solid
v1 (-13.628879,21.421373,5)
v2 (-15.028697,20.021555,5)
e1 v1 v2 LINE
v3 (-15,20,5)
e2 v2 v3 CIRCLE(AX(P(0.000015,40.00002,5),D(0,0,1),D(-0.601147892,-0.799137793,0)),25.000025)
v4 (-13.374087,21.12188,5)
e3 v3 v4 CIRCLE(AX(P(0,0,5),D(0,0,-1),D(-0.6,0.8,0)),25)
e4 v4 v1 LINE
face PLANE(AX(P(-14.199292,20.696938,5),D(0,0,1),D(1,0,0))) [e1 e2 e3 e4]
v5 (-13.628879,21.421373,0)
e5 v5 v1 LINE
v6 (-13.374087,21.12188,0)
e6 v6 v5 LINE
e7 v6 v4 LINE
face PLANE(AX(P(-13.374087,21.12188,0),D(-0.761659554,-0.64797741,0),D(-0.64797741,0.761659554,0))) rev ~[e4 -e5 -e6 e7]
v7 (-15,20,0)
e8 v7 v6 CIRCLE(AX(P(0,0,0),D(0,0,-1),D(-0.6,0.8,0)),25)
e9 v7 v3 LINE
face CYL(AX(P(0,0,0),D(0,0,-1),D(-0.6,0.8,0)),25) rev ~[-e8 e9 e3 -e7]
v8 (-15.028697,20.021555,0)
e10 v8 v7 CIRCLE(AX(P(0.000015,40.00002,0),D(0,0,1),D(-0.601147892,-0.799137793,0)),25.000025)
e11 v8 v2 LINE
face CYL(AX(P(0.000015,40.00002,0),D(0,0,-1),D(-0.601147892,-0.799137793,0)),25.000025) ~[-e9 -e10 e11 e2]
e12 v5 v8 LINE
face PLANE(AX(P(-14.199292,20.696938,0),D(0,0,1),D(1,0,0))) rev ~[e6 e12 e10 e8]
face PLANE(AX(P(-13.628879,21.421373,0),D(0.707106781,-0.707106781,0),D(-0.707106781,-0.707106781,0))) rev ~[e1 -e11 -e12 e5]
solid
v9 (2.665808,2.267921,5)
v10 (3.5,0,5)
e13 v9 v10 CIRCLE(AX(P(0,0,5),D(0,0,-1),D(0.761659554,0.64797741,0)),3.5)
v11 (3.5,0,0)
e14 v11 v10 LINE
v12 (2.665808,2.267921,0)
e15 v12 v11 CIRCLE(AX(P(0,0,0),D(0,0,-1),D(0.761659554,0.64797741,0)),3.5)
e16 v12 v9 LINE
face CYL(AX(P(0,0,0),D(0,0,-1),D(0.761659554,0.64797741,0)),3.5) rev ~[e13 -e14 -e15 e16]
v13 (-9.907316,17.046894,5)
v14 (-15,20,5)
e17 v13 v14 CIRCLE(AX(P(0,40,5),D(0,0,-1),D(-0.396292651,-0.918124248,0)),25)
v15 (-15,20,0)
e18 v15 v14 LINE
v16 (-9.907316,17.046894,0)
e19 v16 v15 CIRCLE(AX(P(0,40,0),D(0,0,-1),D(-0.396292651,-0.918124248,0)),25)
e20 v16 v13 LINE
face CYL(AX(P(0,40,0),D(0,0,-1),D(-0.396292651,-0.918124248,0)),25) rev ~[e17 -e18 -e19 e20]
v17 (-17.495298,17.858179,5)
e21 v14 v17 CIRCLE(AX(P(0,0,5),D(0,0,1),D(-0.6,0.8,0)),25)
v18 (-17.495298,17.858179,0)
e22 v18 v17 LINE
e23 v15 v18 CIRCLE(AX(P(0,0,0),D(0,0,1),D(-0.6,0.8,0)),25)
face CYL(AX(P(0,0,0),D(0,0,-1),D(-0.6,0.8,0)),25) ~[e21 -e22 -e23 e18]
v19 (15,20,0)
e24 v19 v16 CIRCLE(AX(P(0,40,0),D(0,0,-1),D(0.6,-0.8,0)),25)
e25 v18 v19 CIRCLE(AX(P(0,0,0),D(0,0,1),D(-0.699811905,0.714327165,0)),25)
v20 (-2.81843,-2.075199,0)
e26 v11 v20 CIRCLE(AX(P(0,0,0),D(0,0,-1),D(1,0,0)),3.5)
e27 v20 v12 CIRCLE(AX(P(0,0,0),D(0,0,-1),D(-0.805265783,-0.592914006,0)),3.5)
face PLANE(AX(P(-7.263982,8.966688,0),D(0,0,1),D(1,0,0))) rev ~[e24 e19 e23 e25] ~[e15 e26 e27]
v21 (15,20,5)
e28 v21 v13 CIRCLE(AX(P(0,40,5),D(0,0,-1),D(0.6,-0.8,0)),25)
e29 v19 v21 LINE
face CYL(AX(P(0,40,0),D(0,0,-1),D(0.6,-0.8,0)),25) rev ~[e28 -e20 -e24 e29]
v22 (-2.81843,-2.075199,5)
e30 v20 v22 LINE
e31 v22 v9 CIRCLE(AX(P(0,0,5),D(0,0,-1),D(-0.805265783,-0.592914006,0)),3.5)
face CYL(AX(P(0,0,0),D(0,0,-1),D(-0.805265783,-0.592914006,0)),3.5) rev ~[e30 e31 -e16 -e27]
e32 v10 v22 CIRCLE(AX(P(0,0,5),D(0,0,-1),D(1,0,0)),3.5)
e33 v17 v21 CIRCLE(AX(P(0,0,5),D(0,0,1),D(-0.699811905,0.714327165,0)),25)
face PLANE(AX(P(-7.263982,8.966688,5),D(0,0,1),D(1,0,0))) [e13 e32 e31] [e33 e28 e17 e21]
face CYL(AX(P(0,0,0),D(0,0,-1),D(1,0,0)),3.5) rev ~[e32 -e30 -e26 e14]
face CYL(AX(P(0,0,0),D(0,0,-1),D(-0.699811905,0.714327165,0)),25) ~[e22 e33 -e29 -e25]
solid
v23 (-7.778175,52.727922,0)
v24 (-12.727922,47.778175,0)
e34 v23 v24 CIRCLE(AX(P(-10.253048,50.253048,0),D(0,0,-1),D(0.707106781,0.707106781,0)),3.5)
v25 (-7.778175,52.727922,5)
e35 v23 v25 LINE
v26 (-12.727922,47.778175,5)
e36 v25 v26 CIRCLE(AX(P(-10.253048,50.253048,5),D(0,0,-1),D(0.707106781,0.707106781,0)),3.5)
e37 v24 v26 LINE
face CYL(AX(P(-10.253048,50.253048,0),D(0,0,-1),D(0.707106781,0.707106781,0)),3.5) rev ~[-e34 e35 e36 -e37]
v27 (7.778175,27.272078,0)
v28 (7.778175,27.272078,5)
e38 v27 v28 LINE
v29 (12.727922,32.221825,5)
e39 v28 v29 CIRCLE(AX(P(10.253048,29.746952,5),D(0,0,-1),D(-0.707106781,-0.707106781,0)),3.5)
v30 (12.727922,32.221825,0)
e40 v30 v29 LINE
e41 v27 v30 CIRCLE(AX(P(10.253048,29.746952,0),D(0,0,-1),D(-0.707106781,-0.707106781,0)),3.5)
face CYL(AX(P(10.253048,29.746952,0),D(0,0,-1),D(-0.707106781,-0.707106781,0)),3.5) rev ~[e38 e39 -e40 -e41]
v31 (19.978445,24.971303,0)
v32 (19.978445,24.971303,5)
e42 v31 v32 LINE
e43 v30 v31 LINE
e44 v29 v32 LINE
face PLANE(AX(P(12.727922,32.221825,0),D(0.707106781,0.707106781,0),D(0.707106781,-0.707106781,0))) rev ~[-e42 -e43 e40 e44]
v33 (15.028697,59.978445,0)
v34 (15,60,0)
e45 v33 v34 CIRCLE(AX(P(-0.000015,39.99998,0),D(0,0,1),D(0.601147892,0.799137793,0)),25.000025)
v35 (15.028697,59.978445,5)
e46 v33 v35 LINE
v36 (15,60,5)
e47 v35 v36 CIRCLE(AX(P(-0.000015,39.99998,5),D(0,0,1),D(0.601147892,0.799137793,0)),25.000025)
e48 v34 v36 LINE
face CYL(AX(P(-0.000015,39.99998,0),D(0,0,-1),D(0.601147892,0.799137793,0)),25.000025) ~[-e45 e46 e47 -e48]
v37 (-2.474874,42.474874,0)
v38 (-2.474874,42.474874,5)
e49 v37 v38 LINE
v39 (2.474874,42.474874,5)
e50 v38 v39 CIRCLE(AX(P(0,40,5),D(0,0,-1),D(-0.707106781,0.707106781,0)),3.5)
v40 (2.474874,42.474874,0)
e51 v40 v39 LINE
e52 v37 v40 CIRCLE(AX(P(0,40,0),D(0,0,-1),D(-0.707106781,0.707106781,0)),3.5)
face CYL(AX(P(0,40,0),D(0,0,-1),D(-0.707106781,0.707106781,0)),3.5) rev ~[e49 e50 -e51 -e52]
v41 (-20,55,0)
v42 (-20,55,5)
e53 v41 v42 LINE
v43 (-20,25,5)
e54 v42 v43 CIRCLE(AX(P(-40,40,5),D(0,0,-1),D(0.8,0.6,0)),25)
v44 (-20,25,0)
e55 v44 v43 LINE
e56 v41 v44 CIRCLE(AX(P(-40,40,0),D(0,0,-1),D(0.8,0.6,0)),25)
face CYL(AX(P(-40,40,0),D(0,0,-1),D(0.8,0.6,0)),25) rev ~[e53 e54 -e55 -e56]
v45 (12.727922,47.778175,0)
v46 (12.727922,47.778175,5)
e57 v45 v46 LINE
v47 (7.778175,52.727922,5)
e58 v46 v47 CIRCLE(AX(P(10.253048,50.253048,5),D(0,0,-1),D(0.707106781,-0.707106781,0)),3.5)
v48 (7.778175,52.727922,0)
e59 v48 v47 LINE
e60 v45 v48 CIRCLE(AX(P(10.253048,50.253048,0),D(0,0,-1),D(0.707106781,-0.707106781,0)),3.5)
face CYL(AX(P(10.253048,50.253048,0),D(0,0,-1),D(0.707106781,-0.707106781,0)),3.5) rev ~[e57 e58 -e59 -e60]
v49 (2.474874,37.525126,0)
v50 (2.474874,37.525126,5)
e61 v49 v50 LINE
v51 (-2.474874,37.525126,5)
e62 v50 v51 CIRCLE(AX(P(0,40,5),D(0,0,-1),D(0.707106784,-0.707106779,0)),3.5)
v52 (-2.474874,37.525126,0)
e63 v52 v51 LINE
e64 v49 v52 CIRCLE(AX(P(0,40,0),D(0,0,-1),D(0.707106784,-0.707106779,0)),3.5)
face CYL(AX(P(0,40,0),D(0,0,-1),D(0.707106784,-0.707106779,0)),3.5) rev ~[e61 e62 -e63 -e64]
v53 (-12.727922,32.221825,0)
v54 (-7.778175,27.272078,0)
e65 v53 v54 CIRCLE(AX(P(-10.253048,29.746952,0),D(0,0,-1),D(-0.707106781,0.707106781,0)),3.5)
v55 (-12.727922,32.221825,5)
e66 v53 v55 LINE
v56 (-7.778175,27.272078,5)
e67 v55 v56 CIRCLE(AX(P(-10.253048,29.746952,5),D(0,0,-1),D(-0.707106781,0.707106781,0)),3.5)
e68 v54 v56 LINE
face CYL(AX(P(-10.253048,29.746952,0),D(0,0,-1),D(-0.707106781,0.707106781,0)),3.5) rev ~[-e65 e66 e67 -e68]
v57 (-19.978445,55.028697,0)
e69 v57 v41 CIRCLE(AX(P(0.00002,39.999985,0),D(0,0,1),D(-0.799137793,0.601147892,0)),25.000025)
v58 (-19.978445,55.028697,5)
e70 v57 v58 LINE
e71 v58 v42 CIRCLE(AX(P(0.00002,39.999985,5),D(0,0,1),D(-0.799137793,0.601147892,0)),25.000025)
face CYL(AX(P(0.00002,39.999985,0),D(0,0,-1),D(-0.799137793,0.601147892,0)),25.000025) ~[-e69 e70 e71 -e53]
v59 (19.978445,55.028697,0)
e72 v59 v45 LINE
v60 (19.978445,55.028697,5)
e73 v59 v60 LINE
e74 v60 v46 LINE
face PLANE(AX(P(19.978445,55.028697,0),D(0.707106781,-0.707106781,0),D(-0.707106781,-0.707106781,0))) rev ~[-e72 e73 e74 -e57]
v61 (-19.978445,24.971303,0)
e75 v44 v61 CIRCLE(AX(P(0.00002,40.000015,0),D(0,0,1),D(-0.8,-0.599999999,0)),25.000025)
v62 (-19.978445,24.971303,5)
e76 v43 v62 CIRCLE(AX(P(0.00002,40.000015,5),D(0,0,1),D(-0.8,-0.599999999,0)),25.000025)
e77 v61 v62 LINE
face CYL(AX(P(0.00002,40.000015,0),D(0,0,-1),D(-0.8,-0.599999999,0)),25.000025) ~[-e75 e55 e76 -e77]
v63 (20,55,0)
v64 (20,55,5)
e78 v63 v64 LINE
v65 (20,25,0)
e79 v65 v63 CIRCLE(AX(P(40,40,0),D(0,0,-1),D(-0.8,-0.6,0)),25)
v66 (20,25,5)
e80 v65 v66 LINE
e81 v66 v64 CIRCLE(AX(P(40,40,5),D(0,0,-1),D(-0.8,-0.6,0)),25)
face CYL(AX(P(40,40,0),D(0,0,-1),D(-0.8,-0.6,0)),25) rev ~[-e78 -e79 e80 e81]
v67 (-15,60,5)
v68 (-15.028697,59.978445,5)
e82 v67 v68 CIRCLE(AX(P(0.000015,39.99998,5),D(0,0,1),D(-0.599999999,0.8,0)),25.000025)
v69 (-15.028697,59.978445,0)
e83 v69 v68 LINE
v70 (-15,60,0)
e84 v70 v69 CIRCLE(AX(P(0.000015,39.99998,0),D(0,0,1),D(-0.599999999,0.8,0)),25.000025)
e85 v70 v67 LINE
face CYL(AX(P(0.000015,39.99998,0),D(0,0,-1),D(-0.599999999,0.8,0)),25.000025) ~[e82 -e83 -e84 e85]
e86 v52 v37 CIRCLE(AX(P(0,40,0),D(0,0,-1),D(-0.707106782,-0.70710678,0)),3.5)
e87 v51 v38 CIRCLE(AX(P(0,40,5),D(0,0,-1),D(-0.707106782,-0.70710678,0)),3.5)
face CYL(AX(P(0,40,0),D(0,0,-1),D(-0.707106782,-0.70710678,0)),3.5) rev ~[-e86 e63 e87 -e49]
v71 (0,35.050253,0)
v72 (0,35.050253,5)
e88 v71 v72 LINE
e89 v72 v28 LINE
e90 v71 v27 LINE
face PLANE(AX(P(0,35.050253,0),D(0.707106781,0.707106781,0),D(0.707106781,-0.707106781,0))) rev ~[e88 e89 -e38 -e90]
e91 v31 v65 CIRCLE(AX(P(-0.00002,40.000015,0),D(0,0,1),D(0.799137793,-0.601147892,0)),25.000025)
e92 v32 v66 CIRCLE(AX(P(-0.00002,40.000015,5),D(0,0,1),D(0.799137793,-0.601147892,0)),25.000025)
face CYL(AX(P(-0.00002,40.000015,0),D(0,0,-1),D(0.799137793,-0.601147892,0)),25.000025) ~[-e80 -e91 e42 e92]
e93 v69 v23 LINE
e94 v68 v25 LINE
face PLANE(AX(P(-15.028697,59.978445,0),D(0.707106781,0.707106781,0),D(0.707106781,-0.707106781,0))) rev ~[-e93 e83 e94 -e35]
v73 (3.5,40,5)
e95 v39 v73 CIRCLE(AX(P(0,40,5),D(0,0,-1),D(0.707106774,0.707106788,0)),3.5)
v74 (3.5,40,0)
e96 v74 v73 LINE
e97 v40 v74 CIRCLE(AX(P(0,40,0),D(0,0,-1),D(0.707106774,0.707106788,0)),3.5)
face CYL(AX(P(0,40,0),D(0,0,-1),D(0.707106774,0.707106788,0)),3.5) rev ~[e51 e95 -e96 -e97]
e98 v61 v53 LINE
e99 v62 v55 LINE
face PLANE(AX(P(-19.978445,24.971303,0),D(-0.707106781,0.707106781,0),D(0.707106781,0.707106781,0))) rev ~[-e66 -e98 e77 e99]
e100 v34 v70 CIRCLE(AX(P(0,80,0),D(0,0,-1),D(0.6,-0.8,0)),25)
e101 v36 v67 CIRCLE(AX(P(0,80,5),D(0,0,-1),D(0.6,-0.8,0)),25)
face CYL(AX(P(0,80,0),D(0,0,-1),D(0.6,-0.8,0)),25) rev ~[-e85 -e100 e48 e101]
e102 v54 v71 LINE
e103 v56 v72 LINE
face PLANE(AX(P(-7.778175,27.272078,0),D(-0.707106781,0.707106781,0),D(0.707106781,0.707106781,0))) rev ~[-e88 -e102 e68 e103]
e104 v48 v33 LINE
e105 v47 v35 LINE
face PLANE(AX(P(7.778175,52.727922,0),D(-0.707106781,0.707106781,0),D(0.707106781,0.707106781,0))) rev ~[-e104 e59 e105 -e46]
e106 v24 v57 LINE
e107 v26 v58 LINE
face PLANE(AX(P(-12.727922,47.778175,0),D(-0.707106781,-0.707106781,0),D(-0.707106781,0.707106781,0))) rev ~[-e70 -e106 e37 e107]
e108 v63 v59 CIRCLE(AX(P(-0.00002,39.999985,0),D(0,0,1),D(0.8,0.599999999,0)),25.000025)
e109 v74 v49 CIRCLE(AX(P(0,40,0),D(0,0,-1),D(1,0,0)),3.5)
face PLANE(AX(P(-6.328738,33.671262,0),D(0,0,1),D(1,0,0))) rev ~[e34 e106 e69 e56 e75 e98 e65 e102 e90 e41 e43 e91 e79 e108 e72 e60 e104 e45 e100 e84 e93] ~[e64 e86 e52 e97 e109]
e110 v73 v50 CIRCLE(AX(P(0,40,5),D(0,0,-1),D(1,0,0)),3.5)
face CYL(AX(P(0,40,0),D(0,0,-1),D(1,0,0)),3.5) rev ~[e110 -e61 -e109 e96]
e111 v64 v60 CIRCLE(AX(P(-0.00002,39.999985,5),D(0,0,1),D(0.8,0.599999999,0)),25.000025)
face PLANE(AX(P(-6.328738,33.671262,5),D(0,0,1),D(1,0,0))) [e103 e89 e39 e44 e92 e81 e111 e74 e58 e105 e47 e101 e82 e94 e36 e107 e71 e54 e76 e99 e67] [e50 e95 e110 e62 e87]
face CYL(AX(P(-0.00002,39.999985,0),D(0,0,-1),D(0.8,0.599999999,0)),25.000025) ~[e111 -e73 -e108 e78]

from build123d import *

# Parameters (mm, degrees)
F1_DEPTH = 5


# Not quite as in the source:
# - a feature names something its author has since deleted; it is built from what else it names


with BuildPart() as f1:
    # F0 (on Top) → F1 (new body)
    with BuildSketch(Plane.XY):
        with BuildLine():
            ThreePointArc((-9.9073162791, 17.0468938018), (-12.5408855394, 18.3730217116), (-15, 20))
            ThreePointArc((-15, 20), (-16.2829033321, 18.9701623366), (-17.4952976137, 17.8581791179))
            Line((-17.4952976137, 17.8581791179), (-2.8184302399, -2.0751990225))
            ThreePointArc((-2.8184302399, -2.0751990225), (-2.172900388, 2.7438119294), (2.6658084384, 2.2679209355))
            Line((2.6658084384, 2.2679209355), (-9.9073162791, 17.0468938018))
        make_face()
        with BuildLine():
            Line((-2.8184302399, -2.0751990225), (-17.4952976137, 17.8581791179))
            ThreePointArc((-17.4952976137, 17.8581791179), (1.6442252637, -24.9458718685), (15, 20))
            ThreePointArc((15, 20), (2.9434785416, 15.1738860456), (-9.9073162791, 17.0468938018))
            Line((-9.9073162791, 17.0468938018), (2.6658084384, 2.2679209355))
            ThreePointArc((2.6658084384, 2.2679209355), (3.2848386212, 1.2082364143), (3.5, 0))
            ThreePointArc((3.5, 0), (1.0921296078, -3.325244791), (-2.8184302399, -2.0751990225))
        make_face()
    extrude(amount=F1_DEPTH)


with BuildPart() as f1b:
    # F0 (on Top) → F1, piece 2 (new body)
    with BuildSketch(Plane.XY):
        with BuildLine():
            ThreePointArc((-15.0286973301, 20.0215552016), (-15.0143525332, 20.0107724509), (-15, 20))
            ThreePointArc((-15, 20), (-14.1981285052, 20.5770052959), (-13.3740867349, 21.1218797461))
            Line((-13.3740867349, 21.1218797461), (-13.6288791735, 21.4213733582))
            Line((-13.6288791735, 21.4213733582), (-15.0286973301, 20.0215552016))
        make_face()
    extrude(amount=F1_DEPTH)


with BuildPart() as f1c:
    # F0 (on Top) → F1, piece 3 (new body)
    with BuildSketch(Plane.XY):
        with BuildLine():
            ThreePointArc((-12.7279220614, 32.2218254069), (-7.7781745931, 32.2218254069), (-7.7781745931, 27.2720779386))
            Line((-7.7781745931, 27.2720779386), (0, 35.0502525317))
            Line((0, 35.0502525317), (-2.4748737374, 37.5251262691))
            Line((-2.4748737374, 37.5251262691), (-4.9497474683, 40))
            Line((-4.9497474683, 40), (-12.7279220614, 32.2218254069))
        make_face()
        with BuildLine():
            Line((0, 35.0502525317), (7.7781745931, 27.2720779386))
            ThreePointArc((7.7781745931, 27.2720779386), (7.7781745931, 32.2218254069), (12.7279220614, 32.2218254069))
            Line((12.7279220614, 32.2218254069), (4.9497474683, 40))
            Line((4.9497474683, 40), (2.4748737427, 37.5251262744))
            Line((2.4748737427, 37.5251262744), (0, 35.0502525317))
        make_face()
        with BuildLine():
            Line((12.7279220614, 32.2218254069), (19.9784447984, 24.9713026699))
            ThreePointArc((19.9784447984, 24.9713026699), (19.9892275491, 24.9856474668), (20, 25))
            ThreePointArc((20, 25), (15, 40), (20, 55))
            ThreePointArc((20, 55), (19.9892275491, 55.0143525332), (19.9784447984, 55.0286973301))
            Line((19.9784447984, 55.0286973301), (12.7279220614, 47.7781745931))
            Line((12.7279220614, 47.7781745931), (4.9497474683, 40))
            Line((4.9497474683, 40), (12.7279220614, 32.2218254069))
        make_face()
        with BuildLine():
            ThreePointArc((-20, 25), (-19.9892275491, 24.9856474668), (-19.9784447984, 24.9713026699))
            Line((-19.9784447984, 24.9713026699), (-12.7279220614, 32.2218254069))
            Line((-12.7279220614, 32.2218254069), (-4.9497474683, 40))
            Line((-4.9497474683, 40), (-12.7279220614, 47.7781745931))
            Line((-12.7279220614, 47.7781745931), (-19.9784447984, 55.0286973301))
            ThreePointArc((-19.9784447984, 55.0286973301), (-19.9892275491, 55.0143525332), (-20, 55))
            ThreePointArc((-20, 55), (-15, 40), (-20, 25))
        make_face()
        with BuildLine():
            Line((-2.4748737374, 37.5251262691), (0, 35.0502525317))
            Line((0, 35.0502525317), (2.4748737427, 37.5251262744))
            ThreePointArc((2.4748737427, 37.5251262744), (3.7e-09, 36.5), (-2.4748737374, 37.5251262691))
        make_face()
        with BuildLine():
            Line((-4.9497474683, 40), (-2.4748737374, 37.5251262691))
            ThreePointArc((-2.4748737374, 37.5251262691), (-3.5, 40.0000000023), (-2.4748737342, 42.4748737342))
            Line((-2.4748737342, 42.4748737342), (-4.9497474683, 40))
        make_face()
        with BuildLine():
            ThreePointArc((3.5, 40), (3.2335783661, 38.6606079923), (2.4748737427, 37.5251262744))
            Line((2.4748737427, 37.5251262744), (4.9497474683, 40))
            Line((4.9497474683, 40), (2.4748737094, 42.4748737589))
            ThreePointArc((2.4748737094, 42.4748737589), (3.2335783571, 41.3393920295), (3.5, 40))
        make_face()
        with BuildLine():
            Line((-12.7279220614, 47.7781745931), (-4.9497474683, 40))
            Line((-4.9497474683, 40), (-2.4748737342, 42.4748737342))
            Line((-2.4748737342, 42.4748737342), (0, 44.9497474683))
            Line((0, 44.9497474683), (-7.7781745931, 52.7279220614))
            ThreePointArc((-7.7781745931, 52.7279220614), (-7.7781745931, 47.7781745931), (-12.7279220614, 47.7781745931))
        make_face()
        with BuildLine():
            Line((2.4748737094, 42.4748737589), (4.9497474683, 40))
            Line((4.9497474683, 40), (12.7279220614, 47.7781745931))
            ThreePointArc((12.7279220614, 47.7781745931), (7.7781745931, 47.7781745931), (7.7781745931, 52.7279220614))
            Line((7.7781745931, 52.7279220614), (0, 44.9497474683))
            Line((0, 44.9497474683), (2.4748737094, 42.4748737589))
        make_face()
        with BuildLine():
            Line((0, 44.9497474683), (-2.4748737342, 42.4748737342))
            ThreePointArc((-2.4748737342, 42.4748737342), (-1.75e-08, 43.5), (2.4748737094, 42.4748737589))
            Line((2.4748737094, 42.4748737589), (0, 44.9497474683))
        make_face()
        with BuildLine():
            Line((-7.7781745931, 52.7279220614), (0, 44.9497474683))
            Line((0, 44.9497474683), (7.7781745931, 52.7279220614))
            Line((7.7781745931, 52.7279220614), (15.0286973301, 59.9784447984))
            ThreePointArc((15.0286973301, 59.9784447984), (15.0143525332, 59.9892275491), (15, 60))
            ThreePointArc((15, 60), (0, 55), (-15, 60))
            ThreePointArc((-15, 60), (-15.0143525332, 59.9892275491), (-15.0286973301, 59.9784447984))
            Line((-15.0286973301, 59.9784447984), (-7.7781745931, 52.7279220614))
        make_face()
    extrude(amount=F1_DEPTH)


solid = Compound([f1.part, f1b.part, f1c.part])
